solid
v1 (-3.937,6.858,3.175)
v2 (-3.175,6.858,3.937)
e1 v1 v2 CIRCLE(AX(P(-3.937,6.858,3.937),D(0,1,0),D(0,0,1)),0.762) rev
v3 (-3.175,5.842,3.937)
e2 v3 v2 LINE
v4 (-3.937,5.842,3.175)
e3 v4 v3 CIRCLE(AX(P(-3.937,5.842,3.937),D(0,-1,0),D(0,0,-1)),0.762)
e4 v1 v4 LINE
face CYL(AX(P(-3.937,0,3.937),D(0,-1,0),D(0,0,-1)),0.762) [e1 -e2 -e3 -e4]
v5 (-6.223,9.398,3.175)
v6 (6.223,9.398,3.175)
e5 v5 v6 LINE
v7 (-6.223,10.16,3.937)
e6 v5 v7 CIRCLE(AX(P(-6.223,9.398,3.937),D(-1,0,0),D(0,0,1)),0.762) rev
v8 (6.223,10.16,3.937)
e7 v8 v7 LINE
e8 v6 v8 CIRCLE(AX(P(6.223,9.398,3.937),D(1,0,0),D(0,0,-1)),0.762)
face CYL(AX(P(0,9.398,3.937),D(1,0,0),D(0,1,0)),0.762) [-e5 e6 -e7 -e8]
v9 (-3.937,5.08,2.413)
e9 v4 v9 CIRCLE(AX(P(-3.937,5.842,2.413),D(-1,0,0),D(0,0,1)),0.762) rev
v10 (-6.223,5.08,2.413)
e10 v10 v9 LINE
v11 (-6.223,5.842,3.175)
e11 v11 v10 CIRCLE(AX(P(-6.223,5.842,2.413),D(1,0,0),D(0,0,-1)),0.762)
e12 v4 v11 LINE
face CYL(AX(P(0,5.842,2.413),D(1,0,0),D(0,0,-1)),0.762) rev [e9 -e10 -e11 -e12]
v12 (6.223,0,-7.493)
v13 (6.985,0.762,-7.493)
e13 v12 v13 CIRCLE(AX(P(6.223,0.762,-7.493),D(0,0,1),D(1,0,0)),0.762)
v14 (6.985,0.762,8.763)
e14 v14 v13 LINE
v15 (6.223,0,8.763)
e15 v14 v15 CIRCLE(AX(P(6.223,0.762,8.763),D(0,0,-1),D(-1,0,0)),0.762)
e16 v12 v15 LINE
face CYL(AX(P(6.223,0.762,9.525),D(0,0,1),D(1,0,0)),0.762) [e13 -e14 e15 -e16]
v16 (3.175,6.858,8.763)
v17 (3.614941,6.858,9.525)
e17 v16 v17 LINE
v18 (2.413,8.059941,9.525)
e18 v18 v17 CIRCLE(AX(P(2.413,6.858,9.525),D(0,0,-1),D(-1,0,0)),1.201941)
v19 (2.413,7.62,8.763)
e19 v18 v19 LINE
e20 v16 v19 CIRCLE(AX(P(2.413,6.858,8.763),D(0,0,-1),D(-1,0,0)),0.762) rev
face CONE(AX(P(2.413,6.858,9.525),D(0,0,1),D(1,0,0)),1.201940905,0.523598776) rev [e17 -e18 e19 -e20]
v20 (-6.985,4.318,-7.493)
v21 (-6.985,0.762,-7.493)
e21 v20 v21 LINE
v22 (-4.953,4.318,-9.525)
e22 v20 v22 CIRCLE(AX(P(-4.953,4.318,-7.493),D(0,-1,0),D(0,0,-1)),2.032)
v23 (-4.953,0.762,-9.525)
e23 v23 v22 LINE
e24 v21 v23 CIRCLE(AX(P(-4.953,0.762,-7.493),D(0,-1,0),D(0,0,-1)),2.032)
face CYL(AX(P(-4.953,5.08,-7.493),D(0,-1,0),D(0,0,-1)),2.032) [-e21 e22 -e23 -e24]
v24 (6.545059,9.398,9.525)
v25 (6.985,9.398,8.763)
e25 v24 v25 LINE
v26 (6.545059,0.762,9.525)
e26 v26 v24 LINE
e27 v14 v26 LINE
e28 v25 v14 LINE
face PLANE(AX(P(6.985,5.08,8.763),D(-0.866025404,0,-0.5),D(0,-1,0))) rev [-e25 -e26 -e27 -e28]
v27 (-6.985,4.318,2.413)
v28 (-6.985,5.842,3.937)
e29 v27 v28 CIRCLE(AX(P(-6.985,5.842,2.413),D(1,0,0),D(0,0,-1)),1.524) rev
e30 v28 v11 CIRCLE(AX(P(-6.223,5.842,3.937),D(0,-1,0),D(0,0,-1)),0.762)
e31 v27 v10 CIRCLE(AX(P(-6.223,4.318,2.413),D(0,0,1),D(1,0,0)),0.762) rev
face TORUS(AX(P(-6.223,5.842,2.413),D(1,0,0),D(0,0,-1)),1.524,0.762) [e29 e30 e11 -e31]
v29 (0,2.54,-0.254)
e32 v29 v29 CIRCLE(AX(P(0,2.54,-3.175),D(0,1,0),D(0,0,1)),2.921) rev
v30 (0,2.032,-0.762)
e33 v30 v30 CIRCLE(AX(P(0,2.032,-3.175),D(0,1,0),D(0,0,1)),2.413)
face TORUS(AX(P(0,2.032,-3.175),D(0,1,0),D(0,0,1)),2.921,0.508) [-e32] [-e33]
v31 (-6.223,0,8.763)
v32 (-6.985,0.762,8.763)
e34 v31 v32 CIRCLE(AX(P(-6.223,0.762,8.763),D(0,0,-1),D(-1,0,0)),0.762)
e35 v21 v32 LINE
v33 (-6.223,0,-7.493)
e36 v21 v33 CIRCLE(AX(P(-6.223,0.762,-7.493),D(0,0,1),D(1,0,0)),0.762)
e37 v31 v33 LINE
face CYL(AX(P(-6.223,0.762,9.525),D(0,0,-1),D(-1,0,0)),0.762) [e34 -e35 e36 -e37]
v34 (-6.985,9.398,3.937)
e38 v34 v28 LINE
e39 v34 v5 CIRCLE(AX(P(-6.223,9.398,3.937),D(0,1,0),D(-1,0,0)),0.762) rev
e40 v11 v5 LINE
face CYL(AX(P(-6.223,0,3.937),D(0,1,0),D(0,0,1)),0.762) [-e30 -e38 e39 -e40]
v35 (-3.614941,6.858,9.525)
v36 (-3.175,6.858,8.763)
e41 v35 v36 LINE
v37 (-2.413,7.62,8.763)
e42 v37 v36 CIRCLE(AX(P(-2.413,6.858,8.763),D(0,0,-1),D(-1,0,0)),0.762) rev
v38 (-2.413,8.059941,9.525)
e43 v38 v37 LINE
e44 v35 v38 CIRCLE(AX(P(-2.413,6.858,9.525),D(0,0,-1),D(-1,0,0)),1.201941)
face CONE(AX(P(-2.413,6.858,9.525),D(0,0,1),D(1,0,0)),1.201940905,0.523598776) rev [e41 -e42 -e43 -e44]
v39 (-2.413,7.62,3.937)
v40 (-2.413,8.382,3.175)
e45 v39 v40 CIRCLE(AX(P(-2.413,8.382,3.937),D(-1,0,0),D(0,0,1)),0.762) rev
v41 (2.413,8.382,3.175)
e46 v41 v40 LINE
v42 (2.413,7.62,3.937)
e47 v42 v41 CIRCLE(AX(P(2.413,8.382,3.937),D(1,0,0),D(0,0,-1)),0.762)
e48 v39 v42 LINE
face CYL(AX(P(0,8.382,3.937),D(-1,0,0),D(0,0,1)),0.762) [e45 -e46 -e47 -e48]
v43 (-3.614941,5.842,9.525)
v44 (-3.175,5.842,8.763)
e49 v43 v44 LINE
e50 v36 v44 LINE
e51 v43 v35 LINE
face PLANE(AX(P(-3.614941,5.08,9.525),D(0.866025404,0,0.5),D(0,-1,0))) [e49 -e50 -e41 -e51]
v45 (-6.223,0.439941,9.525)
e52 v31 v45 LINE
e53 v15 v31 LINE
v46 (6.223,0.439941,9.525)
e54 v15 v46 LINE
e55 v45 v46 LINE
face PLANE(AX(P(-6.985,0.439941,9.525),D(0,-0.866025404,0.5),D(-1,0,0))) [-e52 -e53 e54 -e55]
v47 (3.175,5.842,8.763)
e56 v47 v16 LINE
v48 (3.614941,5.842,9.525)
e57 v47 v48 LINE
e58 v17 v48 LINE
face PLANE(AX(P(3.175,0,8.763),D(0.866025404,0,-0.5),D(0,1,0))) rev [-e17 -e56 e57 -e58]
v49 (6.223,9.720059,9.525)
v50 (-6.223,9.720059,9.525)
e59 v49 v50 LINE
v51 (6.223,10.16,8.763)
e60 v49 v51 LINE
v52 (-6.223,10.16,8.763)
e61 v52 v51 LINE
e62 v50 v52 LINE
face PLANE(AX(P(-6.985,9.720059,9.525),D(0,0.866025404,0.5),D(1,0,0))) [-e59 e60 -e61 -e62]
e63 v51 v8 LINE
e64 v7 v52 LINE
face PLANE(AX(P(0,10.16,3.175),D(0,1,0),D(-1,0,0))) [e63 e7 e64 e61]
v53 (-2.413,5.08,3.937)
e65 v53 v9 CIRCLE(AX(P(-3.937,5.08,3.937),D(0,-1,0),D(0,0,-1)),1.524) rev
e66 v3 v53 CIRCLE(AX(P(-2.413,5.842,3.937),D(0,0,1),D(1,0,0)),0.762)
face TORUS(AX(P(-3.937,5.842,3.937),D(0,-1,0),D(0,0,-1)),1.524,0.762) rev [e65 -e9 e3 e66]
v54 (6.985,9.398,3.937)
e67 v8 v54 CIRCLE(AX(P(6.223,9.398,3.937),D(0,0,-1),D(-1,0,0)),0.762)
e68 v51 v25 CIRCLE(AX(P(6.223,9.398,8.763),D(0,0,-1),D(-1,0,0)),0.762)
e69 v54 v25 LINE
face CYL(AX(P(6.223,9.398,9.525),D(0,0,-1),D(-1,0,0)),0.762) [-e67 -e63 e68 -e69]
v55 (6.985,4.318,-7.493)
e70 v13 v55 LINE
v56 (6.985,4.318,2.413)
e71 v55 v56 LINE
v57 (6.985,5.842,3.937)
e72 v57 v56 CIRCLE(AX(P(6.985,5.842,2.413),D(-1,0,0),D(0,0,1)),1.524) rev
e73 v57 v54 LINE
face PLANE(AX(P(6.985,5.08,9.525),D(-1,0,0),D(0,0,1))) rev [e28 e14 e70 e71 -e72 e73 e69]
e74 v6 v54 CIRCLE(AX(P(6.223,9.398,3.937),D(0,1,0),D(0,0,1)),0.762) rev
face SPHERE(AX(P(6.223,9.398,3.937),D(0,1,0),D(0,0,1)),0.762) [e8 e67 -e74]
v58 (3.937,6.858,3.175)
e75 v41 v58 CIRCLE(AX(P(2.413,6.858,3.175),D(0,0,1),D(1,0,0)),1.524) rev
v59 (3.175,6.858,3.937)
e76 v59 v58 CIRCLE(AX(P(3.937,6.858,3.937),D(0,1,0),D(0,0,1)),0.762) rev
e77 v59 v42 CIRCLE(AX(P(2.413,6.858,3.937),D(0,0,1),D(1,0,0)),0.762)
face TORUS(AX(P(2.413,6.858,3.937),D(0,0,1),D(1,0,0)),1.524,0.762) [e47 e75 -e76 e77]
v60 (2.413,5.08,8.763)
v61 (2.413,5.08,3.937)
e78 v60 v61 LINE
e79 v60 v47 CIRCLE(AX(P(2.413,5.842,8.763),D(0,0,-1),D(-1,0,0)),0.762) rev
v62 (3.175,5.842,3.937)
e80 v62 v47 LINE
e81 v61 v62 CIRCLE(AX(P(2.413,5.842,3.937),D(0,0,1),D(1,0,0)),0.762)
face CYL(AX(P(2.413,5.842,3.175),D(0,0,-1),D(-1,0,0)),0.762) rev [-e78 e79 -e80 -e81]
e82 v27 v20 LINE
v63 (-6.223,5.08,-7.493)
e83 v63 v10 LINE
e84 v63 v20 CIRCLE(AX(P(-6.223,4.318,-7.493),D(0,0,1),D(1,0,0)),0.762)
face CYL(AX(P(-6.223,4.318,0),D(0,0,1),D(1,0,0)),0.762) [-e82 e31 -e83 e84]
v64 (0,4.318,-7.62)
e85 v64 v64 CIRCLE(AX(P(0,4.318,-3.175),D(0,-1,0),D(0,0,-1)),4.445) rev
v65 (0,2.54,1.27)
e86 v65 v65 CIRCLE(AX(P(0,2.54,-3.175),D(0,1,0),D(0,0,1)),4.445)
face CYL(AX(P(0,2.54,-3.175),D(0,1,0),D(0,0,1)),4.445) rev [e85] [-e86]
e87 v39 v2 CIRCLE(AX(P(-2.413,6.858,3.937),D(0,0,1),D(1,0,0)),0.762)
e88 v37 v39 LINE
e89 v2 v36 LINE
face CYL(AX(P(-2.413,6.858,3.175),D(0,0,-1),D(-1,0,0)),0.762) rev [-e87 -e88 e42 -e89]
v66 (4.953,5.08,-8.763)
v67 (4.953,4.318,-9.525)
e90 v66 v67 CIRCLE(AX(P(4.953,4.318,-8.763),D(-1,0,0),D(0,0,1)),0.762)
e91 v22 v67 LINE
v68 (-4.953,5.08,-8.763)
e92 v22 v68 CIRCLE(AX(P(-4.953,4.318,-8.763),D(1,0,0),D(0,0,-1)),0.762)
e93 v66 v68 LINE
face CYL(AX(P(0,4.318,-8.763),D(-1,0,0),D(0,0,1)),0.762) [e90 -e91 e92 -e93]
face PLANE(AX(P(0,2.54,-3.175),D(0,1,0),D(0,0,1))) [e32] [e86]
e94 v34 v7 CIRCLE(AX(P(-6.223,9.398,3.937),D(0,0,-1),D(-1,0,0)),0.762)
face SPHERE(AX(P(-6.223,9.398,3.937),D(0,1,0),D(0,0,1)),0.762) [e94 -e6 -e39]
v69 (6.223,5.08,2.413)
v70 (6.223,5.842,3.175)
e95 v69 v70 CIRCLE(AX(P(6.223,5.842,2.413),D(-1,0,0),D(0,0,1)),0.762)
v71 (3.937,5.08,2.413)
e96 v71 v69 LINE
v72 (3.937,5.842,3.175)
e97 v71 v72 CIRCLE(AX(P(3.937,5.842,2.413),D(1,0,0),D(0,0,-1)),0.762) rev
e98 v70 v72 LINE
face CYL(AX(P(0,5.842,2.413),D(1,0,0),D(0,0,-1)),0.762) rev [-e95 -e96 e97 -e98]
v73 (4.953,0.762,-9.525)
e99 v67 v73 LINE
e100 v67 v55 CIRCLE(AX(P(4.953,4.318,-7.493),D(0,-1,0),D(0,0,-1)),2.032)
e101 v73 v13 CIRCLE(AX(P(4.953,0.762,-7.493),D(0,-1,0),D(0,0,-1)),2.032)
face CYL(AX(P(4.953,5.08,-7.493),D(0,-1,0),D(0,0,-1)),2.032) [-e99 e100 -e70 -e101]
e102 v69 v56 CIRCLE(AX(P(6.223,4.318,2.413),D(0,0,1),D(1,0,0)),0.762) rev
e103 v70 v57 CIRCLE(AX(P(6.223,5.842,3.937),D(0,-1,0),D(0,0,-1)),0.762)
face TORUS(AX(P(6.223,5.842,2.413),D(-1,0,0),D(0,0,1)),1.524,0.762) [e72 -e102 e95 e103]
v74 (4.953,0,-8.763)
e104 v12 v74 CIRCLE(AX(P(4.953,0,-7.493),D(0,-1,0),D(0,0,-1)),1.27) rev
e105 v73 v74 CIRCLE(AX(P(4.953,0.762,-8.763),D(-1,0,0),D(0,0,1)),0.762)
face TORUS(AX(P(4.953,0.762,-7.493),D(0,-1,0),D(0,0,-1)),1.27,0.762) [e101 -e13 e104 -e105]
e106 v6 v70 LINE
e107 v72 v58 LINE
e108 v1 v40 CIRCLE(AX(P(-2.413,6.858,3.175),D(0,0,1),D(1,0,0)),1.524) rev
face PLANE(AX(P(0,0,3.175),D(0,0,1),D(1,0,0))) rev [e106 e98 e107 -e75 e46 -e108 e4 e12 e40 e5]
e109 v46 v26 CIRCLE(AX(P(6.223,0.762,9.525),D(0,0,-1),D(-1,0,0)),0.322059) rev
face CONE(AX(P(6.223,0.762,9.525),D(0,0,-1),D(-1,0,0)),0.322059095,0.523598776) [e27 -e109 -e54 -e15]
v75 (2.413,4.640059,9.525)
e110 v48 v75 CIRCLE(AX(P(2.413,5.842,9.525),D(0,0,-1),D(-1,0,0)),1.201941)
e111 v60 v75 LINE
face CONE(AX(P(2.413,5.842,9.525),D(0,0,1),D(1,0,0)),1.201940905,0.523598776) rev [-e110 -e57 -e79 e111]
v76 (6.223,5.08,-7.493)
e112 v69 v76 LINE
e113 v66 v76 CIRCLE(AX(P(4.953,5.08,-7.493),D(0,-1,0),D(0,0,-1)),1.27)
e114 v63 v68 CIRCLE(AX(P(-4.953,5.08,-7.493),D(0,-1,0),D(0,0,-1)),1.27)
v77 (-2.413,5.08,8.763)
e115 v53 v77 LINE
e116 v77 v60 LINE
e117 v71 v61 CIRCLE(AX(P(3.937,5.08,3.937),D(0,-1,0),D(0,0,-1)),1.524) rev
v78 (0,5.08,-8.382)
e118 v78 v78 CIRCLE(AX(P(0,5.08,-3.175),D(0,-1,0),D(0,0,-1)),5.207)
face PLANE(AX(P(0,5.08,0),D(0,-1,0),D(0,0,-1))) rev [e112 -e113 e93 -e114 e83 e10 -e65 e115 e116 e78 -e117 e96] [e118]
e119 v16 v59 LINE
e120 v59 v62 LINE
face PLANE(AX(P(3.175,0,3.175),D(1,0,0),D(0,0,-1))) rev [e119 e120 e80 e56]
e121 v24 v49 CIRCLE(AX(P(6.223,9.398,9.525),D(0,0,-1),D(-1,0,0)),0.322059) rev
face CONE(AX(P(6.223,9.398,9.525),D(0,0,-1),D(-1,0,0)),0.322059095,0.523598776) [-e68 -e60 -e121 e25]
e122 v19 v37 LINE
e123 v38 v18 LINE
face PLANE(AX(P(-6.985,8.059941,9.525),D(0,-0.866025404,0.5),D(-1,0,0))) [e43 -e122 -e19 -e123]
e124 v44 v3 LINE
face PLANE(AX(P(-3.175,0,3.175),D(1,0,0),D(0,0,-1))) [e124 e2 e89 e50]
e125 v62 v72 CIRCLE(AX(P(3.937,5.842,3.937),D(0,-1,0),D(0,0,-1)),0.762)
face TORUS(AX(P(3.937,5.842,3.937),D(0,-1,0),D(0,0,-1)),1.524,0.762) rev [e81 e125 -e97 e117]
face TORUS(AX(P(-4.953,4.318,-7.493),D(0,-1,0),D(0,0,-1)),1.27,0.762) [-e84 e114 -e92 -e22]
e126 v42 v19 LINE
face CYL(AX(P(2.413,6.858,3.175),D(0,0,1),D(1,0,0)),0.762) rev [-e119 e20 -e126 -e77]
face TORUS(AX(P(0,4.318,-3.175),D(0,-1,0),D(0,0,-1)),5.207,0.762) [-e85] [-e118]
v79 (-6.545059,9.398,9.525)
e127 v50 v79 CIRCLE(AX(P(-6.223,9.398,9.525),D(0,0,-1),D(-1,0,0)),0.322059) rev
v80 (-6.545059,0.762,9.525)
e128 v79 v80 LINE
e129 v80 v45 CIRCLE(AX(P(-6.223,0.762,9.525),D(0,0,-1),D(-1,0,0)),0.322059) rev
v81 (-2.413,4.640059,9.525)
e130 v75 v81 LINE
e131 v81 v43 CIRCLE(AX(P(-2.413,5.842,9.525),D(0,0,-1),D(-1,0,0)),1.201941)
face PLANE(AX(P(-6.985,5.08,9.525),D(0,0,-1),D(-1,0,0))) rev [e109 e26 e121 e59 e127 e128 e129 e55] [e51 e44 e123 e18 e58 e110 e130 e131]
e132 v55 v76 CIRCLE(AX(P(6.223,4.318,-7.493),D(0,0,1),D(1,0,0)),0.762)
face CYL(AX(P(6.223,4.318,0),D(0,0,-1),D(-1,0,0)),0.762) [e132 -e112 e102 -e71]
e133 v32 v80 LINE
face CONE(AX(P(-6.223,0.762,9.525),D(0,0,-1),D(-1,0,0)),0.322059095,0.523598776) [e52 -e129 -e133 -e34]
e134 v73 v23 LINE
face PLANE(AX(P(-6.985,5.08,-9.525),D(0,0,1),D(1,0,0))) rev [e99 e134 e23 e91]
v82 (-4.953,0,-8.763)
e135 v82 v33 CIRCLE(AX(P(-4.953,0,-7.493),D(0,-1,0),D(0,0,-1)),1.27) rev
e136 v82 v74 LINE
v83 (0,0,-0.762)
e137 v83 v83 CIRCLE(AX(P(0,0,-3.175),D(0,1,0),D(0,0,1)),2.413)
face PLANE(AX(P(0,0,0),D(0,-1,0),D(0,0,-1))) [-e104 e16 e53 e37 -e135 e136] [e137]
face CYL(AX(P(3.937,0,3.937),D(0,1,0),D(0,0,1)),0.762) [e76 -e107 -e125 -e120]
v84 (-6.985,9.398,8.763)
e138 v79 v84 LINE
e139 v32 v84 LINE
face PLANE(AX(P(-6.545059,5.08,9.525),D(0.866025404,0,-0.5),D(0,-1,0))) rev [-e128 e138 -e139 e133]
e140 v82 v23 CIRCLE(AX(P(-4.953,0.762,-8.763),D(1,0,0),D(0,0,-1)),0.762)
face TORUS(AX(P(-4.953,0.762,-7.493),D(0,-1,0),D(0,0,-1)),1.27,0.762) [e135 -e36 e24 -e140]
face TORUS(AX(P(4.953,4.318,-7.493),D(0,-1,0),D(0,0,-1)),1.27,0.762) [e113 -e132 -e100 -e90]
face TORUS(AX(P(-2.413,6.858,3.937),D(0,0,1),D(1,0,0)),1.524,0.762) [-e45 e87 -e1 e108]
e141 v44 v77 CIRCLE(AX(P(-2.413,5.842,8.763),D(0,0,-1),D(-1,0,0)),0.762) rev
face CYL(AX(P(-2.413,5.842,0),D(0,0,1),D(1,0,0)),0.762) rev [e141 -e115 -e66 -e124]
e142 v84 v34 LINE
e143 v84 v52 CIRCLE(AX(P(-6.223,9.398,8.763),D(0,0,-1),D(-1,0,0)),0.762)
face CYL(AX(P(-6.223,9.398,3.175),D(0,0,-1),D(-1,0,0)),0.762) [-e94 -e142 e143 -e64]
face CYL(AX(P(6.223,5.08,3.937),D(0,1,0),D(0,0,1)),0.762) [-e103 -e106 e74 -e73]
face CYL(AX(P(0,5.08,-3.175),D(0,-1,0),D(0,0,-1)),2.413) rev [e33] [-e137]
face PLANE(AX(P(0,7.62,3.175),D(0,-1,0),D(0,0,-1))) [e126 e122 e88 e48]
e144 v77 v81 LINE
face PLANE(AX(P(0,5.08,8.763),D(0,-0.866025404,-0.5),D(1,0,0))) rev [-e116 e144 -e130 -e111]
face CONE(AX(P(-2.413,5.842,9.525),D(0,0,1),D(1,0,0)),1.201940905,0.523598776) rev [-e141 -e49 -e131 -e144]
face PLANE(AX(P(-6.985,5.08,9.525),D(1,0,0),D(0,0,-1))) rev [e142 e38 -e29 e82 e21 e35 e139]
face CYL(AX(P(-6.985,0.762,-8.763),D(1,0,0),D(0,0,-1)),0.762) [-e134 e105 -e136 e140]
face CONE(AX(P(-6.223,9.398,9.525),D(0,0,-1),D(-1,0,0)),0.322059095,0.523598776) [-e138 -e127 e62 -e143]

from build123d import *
from OCP.BRepFilletAPI import BRepFilletAPI_MakeChamfer

# Parameters (mm, degrees)
SKETCH1_W           = 13.97
SKETCH1_H           = 19.05
SKETCH1_R           = 2.413
BOSS_EXTRUDE1_DEPTH = 5.08
SKETCH4_W           = 3.81
SKETCH4_H           = 2.54
BOSS_EXTRUDE4_DEPTH = 6.35
SKETCH5_R           = 4.445
CUT_EXTRUDE1_DEPTH  = 2.54
FILLET2_R           = 0.762
FILLET3_R           = 2.032
CHAMFER2_SIZE       = 0.762
CHAMFER2_SIZE2      = 0.439940905
CHAMFER3_SIZE       = 0.762
CHAMFER3_SIZE2      = 0.439940905
FILLET4_R           = 0.508


with BuildPart() as part:
    # Sketch1 → Boss-Extrude1 (new body)
    with BuildSketch(Plane(origin=(0, 0, 0), x_dir=(1, 0, 0), z_dir=(0, 1, 0))):
        Rectangle(SKETCH1_W, SKETCH1_H)
        with Locations(Location((0, 3.175, 0), (0, 0, 270))):
            Circle(SKETCH1_R, mode=Mode.SUBTRACT)
    extrude(amount=BOSS_EXTRUDE1_DEPTH)

    # Sketch4 → Boss-Extrude4 (add)
    with BuildSketch(Plane.XY.offset(9.525)):
        Polygon((-6.985, 10.16), (-6.985, 7.62), (-3.175, 7.62), (3.175, 7.62), (6.985, 7.62), (6.985, 10.16), align=None)
        with Locations((-5.08, 6.35)):
            Rectangle(SKETCH4_W, SKETCH4_H)
        with Locations((5.08, 6.35)):
            Rectangle(SKETCH4_W, SKETCH4_H)
    extrude(amount=-BOSS_EXTRUDE4_DEPTH)

    # Sketch5 → Cut-Extrude1 (cut)
    with BuildSketch(Plane(origin=(0, 5.08, 0), x_dir=(1, 0, 0), z_dir=(0, 1, 0))):
        with Locations(Location((0, 3.175, 0), (0, 0, 270))):
            Circle(SKETCH5_R)
    extrude(amount=-CUT_EXTRUDE1_DEPTH, mode=Mode.SUBTRACT)

    # Fillet2
    fillet2_edges = [part.edges().sort_by_distance(p)[0] for p in [
        (-6.985, 5.08, -3.175),
        (6.985, 5.08, -3.175),
        (0, 10.16, 3.175),
        (-6.985, 10.16, 6.35),
        (6.985, 7.62, 3.175),
        (6.985, 10.16, 6.35),
        (3.175, 5.08, 6.35),
        (0, 7.62, 3.175),
        (3.175, 7.62, 6.35),
        (-3.175, 6.35, 3.175),
        (-3.175, 7.62, 6.35),
        (-3.175, 5.08, 6.35),
        (-6.985, 7.62, 3.175),
        (5.08, 5.08, 3.175),
        (3.175, 6.35, 3.175),
        (-5.08, 5.08, 3.175),
        (0, 5.08, -7.62),
        (-6.985, 0, 0),
        (0, 0, -9.525),
        (6.985, 0, 0),
        (0, 5.08, -9.525),
    ]]
    fillet(fillet2_edges, radius=FILLET2_R)

    # Fillet3
    # the kernel refuses this fillet: 2.032 mm, written as the material it takes off along each edge
    with BuildSketch(Plane(origin=(-4.953, 5.08, -7.493), x_dir=(0, 0, -1), z_dir=(1, 0, 0))) as fillet3_piece_1:
        with BuildLine():
            CenterArc((1.27, -0.762), 0.762, 0, 90)
            Line((2.032, -0.762), (2.032, 0))
            Line((2.032, 0), (1.27, 0))
        make_face()
    revolve(axis=Axis((-4.953, 5.08, -7.493), (0, 1, 0)), revolution_arc=90, mode=Mode.SUBTRACT)
    with BuildSketch(Plane(origin=(4.953, 5.08, -7.493), x_dir=(1, 0, 0), z_dir=(0, 0, 1))) as fillet3_piece_2:
        with BuildLine():
            CenterArc((1.27, -0.762), 0.762, 0, 90)
            Line((2.032, -0.762), (2.032, 0))
            Line((2.032, 0), (1.27, 0))
        make_face()
    revolve(axis=Axis((4.953, 5.08, -7.493), (0, 1, 0)), revolution_arc=90, mode=Mode.SUBTRACT)
    with BuildSketch(Plane(origin=(-4.953, 0, -7.493), x_dir=(-1, 0, 0), z_dir=(0, 0, 1))) as fillet3_piece_3:
        with BuildLine():
            CenterArc((1.27, -0.762), 0.762, 0, 90)
            Line((2.032, -0.762), (2.032, 0))
            Line((2.032, 0), (1.27, 0))
        make_face()
    revolve(axis=Axis((-4.953, 0, -7.493), (0, -1, 0)), revolution_arc=90, mode=Mode.SUBTRACT)
    with BuildSketch(Plane(origin=(4.953, 0, -7.493), x_dir=(0, 0, -1), z_dir=(-1, 0, 0))) as fillet3_piece_4:
        with BuildLine():
            CenterArc((1.27, -0.762), 0.762, 0, 90)
            Line((2.032, -0.762), (2.032, 0))
            Line((2.032, 0), (1.27, 0))
        make_face()
    revolve(axis=Axis((4.953, 0, -7.493), (0, -1, 0)), revolution_arc=90, mode=Mode.SUBTRACT)
    with BuildSketch(Plane(origin=(6.985, 0, -9.525), x_dir=(0, 0, 1), z_dir=(0, 1, 0))) as fillet3_piece_5:
        with BuildLine():
            CenterArc((FILLET3_R, -FILLET3_R), FILLET3_R, 90, 90)
            Line((0, -FILLET3_R), (0, 0))
            Line((0, 0), (FILLET3_R, 0))
        make_face()
    extrude(amount=5.08, mode=Mode.SUBTRACT)
    with BuildSketch(Plane(origin=(-6.985, 0, -9.525), x_dir=(0, 0, 1), z_dir=(0, 1, 0))) as fillet3_piece_6:
        with BuildLine():
            CenterArc((FILLET3_R, FILLET3_R), FILLET3_R, 180, 90)
            Line((0, FILLET3_R), (0, 0))
            Line((0, 0), (FILLET3_R, 0))
        make_face()
    extrude(amount=5.08, mode=Mode.SUBTRACT)

    # Chamfer2: one chamfer whose edges measure the first distance from different faces: ONE call of the kernel's chamfer builder (chamfer() names one face for all edges)
    chamfer2_edges_1 = [part.edges().sort_by_distance(p)[0] for p in [
        (0, 5.08, 9.525),
    ]]
    chamfer2_side_1 = [part.faces().sort_by_distance(p)[0] for p in [
        (-2.19178656, 5.08, 6.731),
    ]]
    chamfer2_edges_2 = [part.edges().sort_by_distance(p)[0] for p in [
        (3.175, 6.35, 9.525),
    ]]
    chamfer2_side_2 = [part.faces().sort_by_distance(p)[0] for p in [
        (3.175, 6.35, 6.731),
    ]]
    chamfer2_edges_3 = [part.edges().sort_by_distance(p)[0] for p in [
        (-3.175, 6.35, 9.525),
    ]]
    chamfer2_side_3 = [part.faces().sort_by_distance(p)[0] for p in [
        (-3.175, 6.35, 6.731),
    ]]
    chamfer2_edges_4 = [part.edges().sort_by_distance(p)[0] for p in [
        (0, 7.62, 9.525),
    ]]
    chamfer2_side_4 = [part.faces().sort_by_distance(p)[0] for p in [
        (0, 7.62, 6.731),
    ]]
    chamfer2_edges_5 = [part.edges().sort_by_distance(p)[0] for p in [
        (2.951815367, 5.303184633, 9.525),
    ]]
    chamfer2_side_5 = [part.faces().sort_by_distance(p)[0] for p in [
        (2.951815367, 5.303184633, 6.731),
    ]]
    chamfer2_edges_6 = [part.edges().sort_by_distance(p)[0] for p in [
        (-2.951815367, 5.303184633, 9.525),
    ]]
    chamfer2_side_6 = [part.faces().sort_by_distance(p)[0] for p in [
        (-2.951815367, 5.303184633, 6.731),
    ]]
    chamfer2_edges_7 = [part.edges().sort_by_distance(p)[0] for p in [
        (2.951815367, 7.396815367, 9.525),
    ]]
    chamfer2_side_7 = [part.faces().sort_by_distance(p)[0] for p in [
        (2.951815367, 7.396815367, 6.731),
    ]]
    chamfer2_edges_8 = [part.edges().sort_by_distance(p)[0] for p in [
        (-2.951815367, 7.396815367, 9.525),
    ]]
    chamfer2_side_8 = [part.faces().sort_by_distance(p)[0] for p in [
        (-2.951815367, 7.396815367, 6.731),
    ]]
    chamfer2 = BRepFilletAPI_MakeChamfer(part.part.solid().wrapped)
    for e in chamfer2_edges_1:
        chamfer2.Add(CHAMFER2_SIZE, CHAMFER2_SIZE2, e.wrapped, chamfer2_side_1[0].wrapped)  # the first distance lies on this face
    for e in chamfer2_edges_2:
        chamfer2.Add(CHAMFER2_SIZE, CHAMFER2_SIZE2, e.wrapped, chamfer2_side_2[0].wrapped)  # the first distance lies on this face
    for e in chamfer2_edges_3:
        chamfer2.Add(CHAMFER2_SIZE, CHAMFER2_SIZE2, e.wrapped, chamfer2_side_3[0].wrapped)  # the first distance lies on this face
    for e in chamfer2_edges_4:
        chamfer2.Add(CHAMFER2_SIZE, CHAMFER2_SIZE2, e.wrapped, chamfer2_side_4[0].wrapped)  # the first distance lies on this face
    for e in chamfer2_edges_5:
        chamfer2.Add(CHAMFER2_SIZE, CHAMFER2_SIZE2, e.wrapped, chamfer2_side_5[0].wrapped)  # the first distance lies on this face
    for e in chamfer2_edges_6:
        chamfer2.Add(CHAMFER2_SIZE, CHAMFER2_SIZE2, e.wrapped, chamfer2_side_6[0].wrapped)  # the first distance lies on this face
    for e in chamfer2_edges_7:
        chamfer2.Add(CHAMFER2_SIZE, CHAMFER2_SIZE2, e.wrapped, chamfer2_side_7[0].wrapped)  # the first distance lies on this face
    for e in chamfer2_edges_8:
        chamfer2.Add(CHAMFER2_SIZE, CHAMFER2_SIZE2, e.wrapped, chamfer2_side_8[0].wrapped)  # the first distance lies on this face
    add(Compound.cast(chamfer2.Shape()), mode=Mode.REPLACE)

    # Chamfer3: one chamfer whose edges measure the first distance from different faces: ONE call of the kernel's chamfer builder (chamfer() names one face for all edges)
    chamfer3_edges_1 = [part.edges().sort_by_distance(p)[0] for p in [
        (6.985, 5.08, 9.525),
    ]]
    chamfer3_side_1 = [part.faces().sort_by_distance(p)[0] for p in [
        (6.985, 3.922875555, 2.845032122),
    ]]
    chamfer3_edges_2 = [part.edges().sort_by_distance(p)[0] for p in [
        (-6.985, 5.08, 9.525),
    ]]
    chamfer3_side_2 = [part.faces().sort_by_distance(p)[0] for p in [
        (-6.985, 3.922875555, 2.845032122),
    ]]
    chamfer3_edges_3 = [part.edges().sort_by_distance(p)[0] for p in [
        (0, 0, 9.525),
    ]]
    chamfer3_side_3 = [part.faces().sort_by_distance(p)[0] for p in [
        (0, 0, 0.722183851),
    ]]
    chamfer3_edges_4 = [part.edges().sort_by_distance(p)[0] for p in [
        (0, 10.16, 9.525),
    ]]
    chamfer3_side_4 = [part.faces().sort_by_distance(p)[0] for p in [
        (0, 10.16, 6.731),
    ]]
    chamfer3_edges_5 = [part.edges().sort_by_distance(p)[0] for p in [
        (6.761815367, 9.936815367, 9.525),
    ]]
    chamfer3_side_5 = [part.faces().sort_by_distance(p)[0] for p in [
        (6.761815367, 9.936815367, 6.731),
    ]]
    chamfer3_edges_6 = [part.edges().sort_by_distance(p)[0] for p in [
        (-6.761815367, 9.936815367, 9.525),
    ]]
    chamfer3_side_6 = [part.faces().sort_by_distance(p)[0] for p in [
        (-6.761815367, 9.936815367, 6.731),
    ]]
    chamfer3_edges_7 = [part.edges().sort_by_distance(p)[0] for p in [
        (-6.761815367, 0.223184633, 9.525),
    ]]
    chamfer3_side_7 = [part.faces().sort_by_distance(p)[0] for p in [
        (-6.761815367, 0.223184633, 1.016),
    ]]
    chamfer3_edges_8 = [part.edges().sort_by_distance(p)[0] for p in [
        (6.761815367, 0.223184633, 9.525),
    ]]
    chamfer3_side_8 = [part.faces().sort_by_distance(p)[0] for p in [
        (6.761815367, 0.223184633, 1.016),
    ]]
    chamfer3 = BRepFilletAPI_MakeChamfer(part.part.solid().wrapped)
    for e in chamfer3_edges_1:
        chamfer3.Add(CHAMFER3_SIZE, CHAMFER3_SIZE2, e.wrapped, chamfer3_side_1[0].wrapped)  # the first distance lies on this face
    for e in chamfer3_edges_2:
        chamfer3.Add(CHAMFER3_SIZE, CHAMFER3_SIZE2, e.wrapped, chamfer3_side_2[0].wrapped)  # the first distance lies on this face
    for e in chamfer3_edges_3:
        chamfer3.Add(CHAMFER3_SIZE, CHAMFER3_SIZE2, e.wrapped, chamfer3_side_3[0].wrapped)  # the first distance lies on this face
    for e in chamfer3_edges_4:
        chamfer3.Add(CHAMFER3_SIZE, CHAMFER3_SIZE2, e.wrapped, chamfer3_side_4[0].wrapped)  # the first distance lies on this face
    for e in chamfer3_edges_5:
        chamfer3.Add(CHAMFER3_SIZE, CHAMFER3_SIZE2, e.wrapped, chamfer3_side_5[0].wrapped)  # the first distance lies on this face
    for e in chamfer3_edges_6:
        chamfer3.Add(CHAMFER3_SIZE, CHAMFER3_SIZE2, e.wrapped, chamfer3_side_6[0].wrapped)  # the first distance lies on this face
    for e in chamfer3_edges_7:
        chamfer3.Add(CHAMFER3_SIZE, CHAMFER3_SIZE2, e.wrapped, chamfer3_side_7[0].wrapped)  # the first distance lies on this face
    for e in chamfer3_edges_8:
        chamfer3.Add(CHAMFER3_SIZE, CHAMFER3_SIZE2, e.wrapped, chamfer3_side_8[0].wrapped)  # the first distance lies on this face
    add(Compound.cast(chamfer3.Shape()), mode=Mode.REPLACE)

    # Fillet4
    fillet4_edges = [part.edges().sort_by_distance(p)[0] for p in [
        (0, 2.54, -5.588),
    ]]
    fillet(fillet4_edges, radius=FILLET4_R)


solid = part.part
